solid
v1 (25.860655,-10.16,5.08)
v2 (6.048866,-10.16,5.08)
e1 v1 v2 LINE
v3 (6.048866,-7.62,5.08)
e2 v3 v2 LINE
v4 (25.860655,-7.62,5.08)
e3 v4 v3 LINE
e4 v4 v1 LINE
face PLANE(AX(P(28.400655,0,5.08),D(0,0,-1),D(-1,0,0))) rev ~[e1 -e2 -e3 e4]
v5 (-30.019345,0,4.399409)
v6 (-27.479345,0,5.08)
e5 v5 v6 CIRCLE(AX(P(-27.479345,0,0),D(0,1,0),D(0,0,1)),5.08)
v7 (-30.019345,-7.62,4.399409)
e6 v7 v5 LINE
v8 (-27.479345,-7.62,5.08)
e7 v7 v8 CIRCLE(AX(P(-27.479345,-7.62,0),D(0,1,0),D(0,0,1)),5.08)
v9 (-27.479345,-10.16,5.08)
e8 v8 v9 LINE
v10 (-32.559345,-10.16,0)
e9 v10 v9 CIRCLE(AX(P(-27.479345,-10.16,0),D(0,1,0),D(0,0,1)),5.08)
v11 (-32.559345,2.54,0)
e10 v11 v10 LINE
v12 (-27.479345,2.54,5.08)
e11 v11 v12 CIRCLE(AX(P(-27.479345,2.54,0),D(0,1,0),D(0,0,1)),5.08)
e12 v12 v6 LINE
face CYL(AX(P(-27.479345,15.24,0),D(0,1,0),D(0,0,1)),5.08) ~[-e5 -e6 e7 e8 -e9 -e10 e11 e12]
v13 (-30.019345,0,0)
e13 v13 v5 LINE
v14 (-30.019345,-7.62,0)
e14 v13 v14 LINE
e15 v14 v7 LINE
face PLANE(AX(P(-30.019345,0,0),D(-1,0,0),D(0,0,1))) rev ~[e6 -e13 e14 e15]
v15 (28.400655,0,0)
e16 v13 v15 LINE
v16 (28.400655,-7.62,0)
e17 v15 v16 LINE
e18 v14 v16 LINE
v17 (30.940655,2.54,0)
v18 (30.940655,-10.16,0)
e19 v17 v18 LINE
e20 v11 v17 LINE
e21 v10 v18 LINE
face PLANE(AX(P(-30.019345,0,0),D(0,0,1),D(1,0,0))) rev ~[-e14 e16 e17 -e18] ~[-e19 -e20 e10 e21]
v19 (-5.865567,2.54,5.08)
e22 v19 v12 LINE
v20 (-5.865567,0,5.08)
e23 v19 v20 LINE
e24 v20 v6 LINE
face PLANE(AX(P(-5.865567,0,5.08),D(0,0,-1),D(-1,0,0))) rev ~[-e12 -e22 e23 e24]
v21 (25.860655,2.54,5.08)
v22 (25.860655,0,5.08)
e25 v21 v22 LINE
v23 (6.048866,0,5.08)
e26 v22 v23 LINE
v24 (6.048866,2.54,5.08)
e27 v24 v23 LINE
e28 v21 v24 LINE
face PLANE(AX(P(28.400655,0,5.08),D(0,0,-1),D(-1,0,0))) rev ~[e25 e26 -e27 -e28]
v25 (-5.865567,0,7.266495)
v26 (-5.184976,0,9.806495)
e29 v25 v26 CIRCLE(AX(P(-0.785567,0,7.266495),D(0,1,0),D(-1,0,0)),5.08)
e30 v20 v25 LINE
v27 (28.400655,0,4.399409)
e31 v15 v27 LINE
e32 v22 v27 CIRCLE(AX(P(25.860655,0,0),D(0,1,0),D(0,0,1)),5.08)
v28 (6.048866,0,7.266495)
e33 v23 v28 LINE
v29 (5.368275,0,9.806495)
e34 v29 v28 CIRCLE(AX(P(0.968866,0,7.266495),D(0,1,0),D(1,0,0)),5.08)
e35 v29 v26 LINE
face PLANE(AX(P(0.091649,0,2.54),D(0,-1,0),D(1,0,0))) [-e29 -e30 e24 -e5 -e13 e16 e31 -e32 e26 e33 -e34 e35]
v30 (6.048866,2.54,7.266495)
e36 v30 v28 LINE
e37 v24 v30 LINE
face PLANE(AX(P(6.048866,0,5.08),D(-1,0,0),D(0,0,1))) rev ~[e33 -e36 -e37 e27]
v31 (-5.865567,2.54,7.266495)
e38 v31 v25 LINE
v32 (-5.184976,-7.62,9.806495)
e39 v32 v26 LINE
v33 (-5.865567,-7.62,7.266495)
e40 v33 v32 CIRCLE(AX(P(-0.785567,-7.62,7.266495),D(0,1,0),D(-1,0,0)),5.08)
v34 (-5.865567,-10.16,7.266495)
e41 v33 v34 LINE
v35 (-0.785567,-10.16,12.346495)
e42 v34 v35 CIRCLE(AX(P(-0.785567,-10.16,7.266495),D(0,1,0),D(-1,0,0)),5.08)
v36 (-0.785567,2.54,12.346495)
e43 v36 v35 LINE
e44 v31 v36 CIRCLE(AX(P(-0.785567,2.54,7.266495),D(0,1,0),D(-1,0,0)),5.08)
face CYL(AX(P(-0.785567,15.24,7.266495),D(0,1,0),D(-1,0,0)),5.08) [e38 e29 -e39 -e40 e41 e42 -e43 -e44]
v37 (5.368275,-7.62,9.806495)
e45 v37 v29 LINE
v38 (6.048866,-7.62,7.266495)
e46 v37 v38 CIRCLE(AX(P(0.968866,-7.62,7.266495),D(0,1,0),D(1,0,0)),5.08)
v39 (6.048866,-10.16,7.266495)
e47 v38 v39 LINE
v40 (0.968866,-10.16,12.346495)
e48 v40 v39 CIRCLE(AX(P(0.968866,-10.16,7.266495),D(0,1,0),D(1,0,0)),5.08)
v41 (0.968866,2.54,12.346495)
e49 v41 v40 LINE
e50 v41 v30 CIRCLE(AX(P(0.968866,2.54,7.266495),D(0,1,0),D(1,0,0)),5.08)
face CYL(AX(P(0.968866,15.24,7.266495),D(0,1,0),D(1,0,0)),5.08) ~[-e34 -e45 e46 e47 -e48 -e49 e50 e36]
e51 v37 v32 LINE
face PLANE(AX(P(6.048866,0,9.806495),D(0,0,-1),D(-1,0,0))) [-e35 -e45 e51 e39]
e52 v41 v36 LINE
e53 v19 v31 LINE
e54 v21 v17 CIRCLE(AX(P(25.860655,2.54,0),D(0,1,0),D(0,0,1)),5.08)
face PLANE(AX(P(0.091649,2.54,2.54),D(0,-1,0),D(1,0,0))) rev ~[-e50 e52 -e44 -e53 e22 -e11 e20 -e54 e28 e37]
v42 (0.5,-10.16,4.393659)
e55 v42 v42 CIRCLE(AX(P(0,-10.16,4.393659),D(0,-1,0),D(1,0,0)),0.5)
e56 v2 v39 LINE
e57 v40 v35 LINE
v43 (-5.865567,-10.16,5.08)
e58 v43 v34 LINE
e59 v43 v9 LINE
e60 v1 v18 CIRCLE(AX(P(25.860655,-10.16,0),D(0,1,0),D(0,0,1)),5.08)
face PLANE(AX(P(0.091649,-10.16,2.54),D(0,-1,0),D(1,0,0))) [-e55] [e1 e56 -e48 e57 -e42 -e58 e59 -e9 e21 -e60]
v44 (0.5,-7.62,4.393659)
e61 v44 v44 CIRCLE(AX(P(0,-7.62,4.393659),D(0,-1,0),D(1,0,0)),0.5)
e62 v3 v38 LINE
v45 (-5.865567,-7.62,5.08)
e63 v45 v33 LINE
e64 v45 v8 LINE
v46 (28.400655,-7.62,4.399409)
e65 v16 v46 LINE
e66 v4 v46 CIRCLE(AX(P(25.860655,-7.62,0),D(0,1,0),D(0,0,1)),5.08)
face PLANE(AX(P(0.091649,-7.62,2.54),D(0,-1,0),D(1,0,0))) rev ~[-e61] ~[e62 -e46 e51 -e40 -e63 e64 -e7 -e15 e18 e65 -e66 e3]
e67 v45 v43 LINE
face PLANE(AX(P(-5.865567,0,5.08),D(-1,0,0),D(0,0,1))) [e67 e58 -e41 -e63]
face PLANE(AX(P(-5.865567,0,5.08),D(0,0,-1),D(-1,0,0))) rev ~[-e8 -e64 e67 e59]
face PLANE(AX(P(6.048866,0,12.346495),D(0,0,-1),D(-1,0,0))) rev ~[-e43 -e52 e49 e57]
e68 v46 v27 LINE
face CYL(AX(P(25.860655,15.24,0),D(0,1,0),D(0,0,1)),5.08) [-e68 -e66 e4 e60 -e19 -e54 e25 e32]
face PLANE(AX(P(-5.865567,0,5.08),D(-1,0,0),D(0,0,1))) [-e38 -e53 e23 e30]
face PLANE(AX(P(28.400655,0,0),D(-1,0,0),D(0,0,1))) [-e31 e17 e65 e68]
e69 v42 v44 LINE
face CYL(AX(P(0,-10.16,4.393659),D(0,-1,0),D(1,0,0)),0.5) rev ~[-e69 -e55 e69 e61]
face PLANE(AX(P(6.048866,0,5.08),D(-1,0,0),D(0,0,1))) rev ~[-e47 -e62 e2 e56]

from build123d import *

# Parameters (mm, degrees)
F0_W        = 22.3517898379
F0_H        = 5.08
F0_W_2      = 24.1537776476
F0_W_3      = 6.0488656163
F0_H_2      = 4.7264951599
F0_W_4      = 5.8655668981
F1_DEPTH    = 7.62
F2_T        = 2.54
F3_R        = 0.5
F4_DEPTH    = 8.10174
F6_T1_DEPTH = 38.1
F6_T3_DEPTH = 38.1
F6_T5_DEPTH = 38.1
F6_T7_DEPTH = 38.1
F7_DEPTH    = 7.36236


# Not quite as in the source:
# - a fillet or chamfer that OpenCascade refuses, or shapes differently, is made with other operations: its cross-section is extruded or revolved along the edge and cut away or added
# - a feature of the source that left no trace in its solid (it failed there, or was rolled back) is left out


with BuildPart() as f1:
    # F0 (on Front) → F1 (new body)
    with BuildSketch(Plane.XZ):
        Polygon((-5.8655668981, 0), (0, 0), (6.0488656163, 0), (6.0488656163, 5.08), (0, 5.08), (-5.8655668981, 5.08), align=None)
        with Locations((17.2247605353, 2.54)):
            Rectangle(F0_W, F0_H)
        with Locations((-17.942455722, 2.54)):
            Rectangle(F0_W_2, F0_H)
        with Locations((3.0244328082, 7.4432475799)):
            Rectangle(F0_W_3, F0_H_2)
        with Locations((-2.9327834491, 7.4432475799)):
            Rectangle(F0_W_4, F0_H_2)
    extrude(amount=F1_DEPTH)

    # F2
    f2_openings = [f1.faces().sort_by_distance(p)[0] for p in [
        (-17.942456, -3.81, 5.08),
        (-0.809345, -3.81, 0),
        (17.224761, -3.81, 5.08),
        (6.048866, -3.81, 7.443248),
        (-5.865567, -3.81, 7.443248),
    ]]
    offset(amount=F2_T, openings=f2_openings, kind=Kind.INTERSECTION)

    # F3 (on face) → F4 (cut)
    with BuildSketch(Plane.XZ.offset(10.16)):
        with Locations((0, 4.3936586007)):
            Circle(F3_R)
    extrude(amount=-F4_DEPTH, mode=Mode.SUBTRACT)

    # F6: fillet of radius 5.08 on 6 edges, made by hand

    # F6_s2 → F6_t1 (cut)
    with BuildSketch(Plane.XZ.offset(-15.24)):
        with BuildLine():
            ThreePointArc((25.8606554542, 5.08), (29.4527579027, 3.5921024484), (30.9406554542, 0))
            Line((30.9406554542, 0), (31.0422554542, 0))
            Line((31.0422554542, 0), (31.0422554542, 5.1816))
            Line((31.0422554542, 5.1816), (25.8606554542, 5.1816))
            Line((25.8606554542, 5.1816), (25.8606554542, 5.08))
        make_face()
    extrude(amount=F6_T1_DEPTH, mode=Mode.SUBTRACT)

    # F6_s4 → F6_t3 (cut)
    with BuildSketch(Plane.XZ.offset(-15.24)):
        with BuildLine():
            ThreePointArc((-27.4793445458, 5.08), (-31.0714469942, 3.5921024484), (-32.5593445458, 0))
            Line((-32.5593445458, 0), (-32.6609445458, 0))
            Line((-32.6609445458, 0), (-32.6609445458, 5.1816))
            Line((-32.6609445458, 5.1816), (-27.4793445458, 5.1816))
            Line((-27.4793445458, 5.1816), (-27.4793445458, 5.08))
        make_face()
    extrude(amount=F6_T3_DEPTH, mode=Mode.SUBTRACT)

    # F6_s6 → F6_t5 (cut)
    with BuildSketch(Plane.XZ.offset(-15.24)):
        with BuildLine():
            ThreePointArc((6.0488656163, 7.2664951599), (4.5609680647, 10.8585976083), (0.9688656163, 12.3464951599))
            Line((0.9688656163, 12.3464951599), (0.9688656163, 12.4480951599))
            Line((0.9688656163, 12.4480951599), (6.1504656163, 12.4480951599))
            Line((6.1504656163, 12.4480951599), (6.1504656163, 7.2664951599))
            Line((6.1504656163, 7.2664951599), (6.0488656163, 7.2664951599))
        make_face()
    extrude(amount=F6_T5_DEPTH, mode=Mode.SUBTRACT)

    # F6_s8 → F6_t7 (cut)
    with BuildSketch(Plane.XZ.offset(-15.24)):
        with BuildLine():
            ThreePointArc((-5.8655668981, 7.2664951599), (-4.3776693466, 10.8585976083), (-0.7855668981, 12.3464951599))
            Line((-0.7855668981, 12.3464951599), (-0.7855668981, 12.4480951599))
            Line((-0.7855668981, 12.4480951599), (-5.9671668981, 12.4480951599))
            Line((-5.9671668981, 12.4480951599), (-5.9671668981, 7.2664951599))
            Line((-5.9671668981, 7.2664951599), (-5.8655668981, 7.2664951599))
        make_face()
    extrude(amount=F6_T7_DEPTH, mode=Mode.SUBTRACT)

    # F3 (on face) → F7 (cut)
    with BuildSketch(Plane.XZ.offset(10.16)):
        with Locations((0, 4.3936586007)):
            Circle(F3_R)
    extrude(amount=-F7_DEPTH, mode=Mode.SUBTRACT)


solid = f1.part
